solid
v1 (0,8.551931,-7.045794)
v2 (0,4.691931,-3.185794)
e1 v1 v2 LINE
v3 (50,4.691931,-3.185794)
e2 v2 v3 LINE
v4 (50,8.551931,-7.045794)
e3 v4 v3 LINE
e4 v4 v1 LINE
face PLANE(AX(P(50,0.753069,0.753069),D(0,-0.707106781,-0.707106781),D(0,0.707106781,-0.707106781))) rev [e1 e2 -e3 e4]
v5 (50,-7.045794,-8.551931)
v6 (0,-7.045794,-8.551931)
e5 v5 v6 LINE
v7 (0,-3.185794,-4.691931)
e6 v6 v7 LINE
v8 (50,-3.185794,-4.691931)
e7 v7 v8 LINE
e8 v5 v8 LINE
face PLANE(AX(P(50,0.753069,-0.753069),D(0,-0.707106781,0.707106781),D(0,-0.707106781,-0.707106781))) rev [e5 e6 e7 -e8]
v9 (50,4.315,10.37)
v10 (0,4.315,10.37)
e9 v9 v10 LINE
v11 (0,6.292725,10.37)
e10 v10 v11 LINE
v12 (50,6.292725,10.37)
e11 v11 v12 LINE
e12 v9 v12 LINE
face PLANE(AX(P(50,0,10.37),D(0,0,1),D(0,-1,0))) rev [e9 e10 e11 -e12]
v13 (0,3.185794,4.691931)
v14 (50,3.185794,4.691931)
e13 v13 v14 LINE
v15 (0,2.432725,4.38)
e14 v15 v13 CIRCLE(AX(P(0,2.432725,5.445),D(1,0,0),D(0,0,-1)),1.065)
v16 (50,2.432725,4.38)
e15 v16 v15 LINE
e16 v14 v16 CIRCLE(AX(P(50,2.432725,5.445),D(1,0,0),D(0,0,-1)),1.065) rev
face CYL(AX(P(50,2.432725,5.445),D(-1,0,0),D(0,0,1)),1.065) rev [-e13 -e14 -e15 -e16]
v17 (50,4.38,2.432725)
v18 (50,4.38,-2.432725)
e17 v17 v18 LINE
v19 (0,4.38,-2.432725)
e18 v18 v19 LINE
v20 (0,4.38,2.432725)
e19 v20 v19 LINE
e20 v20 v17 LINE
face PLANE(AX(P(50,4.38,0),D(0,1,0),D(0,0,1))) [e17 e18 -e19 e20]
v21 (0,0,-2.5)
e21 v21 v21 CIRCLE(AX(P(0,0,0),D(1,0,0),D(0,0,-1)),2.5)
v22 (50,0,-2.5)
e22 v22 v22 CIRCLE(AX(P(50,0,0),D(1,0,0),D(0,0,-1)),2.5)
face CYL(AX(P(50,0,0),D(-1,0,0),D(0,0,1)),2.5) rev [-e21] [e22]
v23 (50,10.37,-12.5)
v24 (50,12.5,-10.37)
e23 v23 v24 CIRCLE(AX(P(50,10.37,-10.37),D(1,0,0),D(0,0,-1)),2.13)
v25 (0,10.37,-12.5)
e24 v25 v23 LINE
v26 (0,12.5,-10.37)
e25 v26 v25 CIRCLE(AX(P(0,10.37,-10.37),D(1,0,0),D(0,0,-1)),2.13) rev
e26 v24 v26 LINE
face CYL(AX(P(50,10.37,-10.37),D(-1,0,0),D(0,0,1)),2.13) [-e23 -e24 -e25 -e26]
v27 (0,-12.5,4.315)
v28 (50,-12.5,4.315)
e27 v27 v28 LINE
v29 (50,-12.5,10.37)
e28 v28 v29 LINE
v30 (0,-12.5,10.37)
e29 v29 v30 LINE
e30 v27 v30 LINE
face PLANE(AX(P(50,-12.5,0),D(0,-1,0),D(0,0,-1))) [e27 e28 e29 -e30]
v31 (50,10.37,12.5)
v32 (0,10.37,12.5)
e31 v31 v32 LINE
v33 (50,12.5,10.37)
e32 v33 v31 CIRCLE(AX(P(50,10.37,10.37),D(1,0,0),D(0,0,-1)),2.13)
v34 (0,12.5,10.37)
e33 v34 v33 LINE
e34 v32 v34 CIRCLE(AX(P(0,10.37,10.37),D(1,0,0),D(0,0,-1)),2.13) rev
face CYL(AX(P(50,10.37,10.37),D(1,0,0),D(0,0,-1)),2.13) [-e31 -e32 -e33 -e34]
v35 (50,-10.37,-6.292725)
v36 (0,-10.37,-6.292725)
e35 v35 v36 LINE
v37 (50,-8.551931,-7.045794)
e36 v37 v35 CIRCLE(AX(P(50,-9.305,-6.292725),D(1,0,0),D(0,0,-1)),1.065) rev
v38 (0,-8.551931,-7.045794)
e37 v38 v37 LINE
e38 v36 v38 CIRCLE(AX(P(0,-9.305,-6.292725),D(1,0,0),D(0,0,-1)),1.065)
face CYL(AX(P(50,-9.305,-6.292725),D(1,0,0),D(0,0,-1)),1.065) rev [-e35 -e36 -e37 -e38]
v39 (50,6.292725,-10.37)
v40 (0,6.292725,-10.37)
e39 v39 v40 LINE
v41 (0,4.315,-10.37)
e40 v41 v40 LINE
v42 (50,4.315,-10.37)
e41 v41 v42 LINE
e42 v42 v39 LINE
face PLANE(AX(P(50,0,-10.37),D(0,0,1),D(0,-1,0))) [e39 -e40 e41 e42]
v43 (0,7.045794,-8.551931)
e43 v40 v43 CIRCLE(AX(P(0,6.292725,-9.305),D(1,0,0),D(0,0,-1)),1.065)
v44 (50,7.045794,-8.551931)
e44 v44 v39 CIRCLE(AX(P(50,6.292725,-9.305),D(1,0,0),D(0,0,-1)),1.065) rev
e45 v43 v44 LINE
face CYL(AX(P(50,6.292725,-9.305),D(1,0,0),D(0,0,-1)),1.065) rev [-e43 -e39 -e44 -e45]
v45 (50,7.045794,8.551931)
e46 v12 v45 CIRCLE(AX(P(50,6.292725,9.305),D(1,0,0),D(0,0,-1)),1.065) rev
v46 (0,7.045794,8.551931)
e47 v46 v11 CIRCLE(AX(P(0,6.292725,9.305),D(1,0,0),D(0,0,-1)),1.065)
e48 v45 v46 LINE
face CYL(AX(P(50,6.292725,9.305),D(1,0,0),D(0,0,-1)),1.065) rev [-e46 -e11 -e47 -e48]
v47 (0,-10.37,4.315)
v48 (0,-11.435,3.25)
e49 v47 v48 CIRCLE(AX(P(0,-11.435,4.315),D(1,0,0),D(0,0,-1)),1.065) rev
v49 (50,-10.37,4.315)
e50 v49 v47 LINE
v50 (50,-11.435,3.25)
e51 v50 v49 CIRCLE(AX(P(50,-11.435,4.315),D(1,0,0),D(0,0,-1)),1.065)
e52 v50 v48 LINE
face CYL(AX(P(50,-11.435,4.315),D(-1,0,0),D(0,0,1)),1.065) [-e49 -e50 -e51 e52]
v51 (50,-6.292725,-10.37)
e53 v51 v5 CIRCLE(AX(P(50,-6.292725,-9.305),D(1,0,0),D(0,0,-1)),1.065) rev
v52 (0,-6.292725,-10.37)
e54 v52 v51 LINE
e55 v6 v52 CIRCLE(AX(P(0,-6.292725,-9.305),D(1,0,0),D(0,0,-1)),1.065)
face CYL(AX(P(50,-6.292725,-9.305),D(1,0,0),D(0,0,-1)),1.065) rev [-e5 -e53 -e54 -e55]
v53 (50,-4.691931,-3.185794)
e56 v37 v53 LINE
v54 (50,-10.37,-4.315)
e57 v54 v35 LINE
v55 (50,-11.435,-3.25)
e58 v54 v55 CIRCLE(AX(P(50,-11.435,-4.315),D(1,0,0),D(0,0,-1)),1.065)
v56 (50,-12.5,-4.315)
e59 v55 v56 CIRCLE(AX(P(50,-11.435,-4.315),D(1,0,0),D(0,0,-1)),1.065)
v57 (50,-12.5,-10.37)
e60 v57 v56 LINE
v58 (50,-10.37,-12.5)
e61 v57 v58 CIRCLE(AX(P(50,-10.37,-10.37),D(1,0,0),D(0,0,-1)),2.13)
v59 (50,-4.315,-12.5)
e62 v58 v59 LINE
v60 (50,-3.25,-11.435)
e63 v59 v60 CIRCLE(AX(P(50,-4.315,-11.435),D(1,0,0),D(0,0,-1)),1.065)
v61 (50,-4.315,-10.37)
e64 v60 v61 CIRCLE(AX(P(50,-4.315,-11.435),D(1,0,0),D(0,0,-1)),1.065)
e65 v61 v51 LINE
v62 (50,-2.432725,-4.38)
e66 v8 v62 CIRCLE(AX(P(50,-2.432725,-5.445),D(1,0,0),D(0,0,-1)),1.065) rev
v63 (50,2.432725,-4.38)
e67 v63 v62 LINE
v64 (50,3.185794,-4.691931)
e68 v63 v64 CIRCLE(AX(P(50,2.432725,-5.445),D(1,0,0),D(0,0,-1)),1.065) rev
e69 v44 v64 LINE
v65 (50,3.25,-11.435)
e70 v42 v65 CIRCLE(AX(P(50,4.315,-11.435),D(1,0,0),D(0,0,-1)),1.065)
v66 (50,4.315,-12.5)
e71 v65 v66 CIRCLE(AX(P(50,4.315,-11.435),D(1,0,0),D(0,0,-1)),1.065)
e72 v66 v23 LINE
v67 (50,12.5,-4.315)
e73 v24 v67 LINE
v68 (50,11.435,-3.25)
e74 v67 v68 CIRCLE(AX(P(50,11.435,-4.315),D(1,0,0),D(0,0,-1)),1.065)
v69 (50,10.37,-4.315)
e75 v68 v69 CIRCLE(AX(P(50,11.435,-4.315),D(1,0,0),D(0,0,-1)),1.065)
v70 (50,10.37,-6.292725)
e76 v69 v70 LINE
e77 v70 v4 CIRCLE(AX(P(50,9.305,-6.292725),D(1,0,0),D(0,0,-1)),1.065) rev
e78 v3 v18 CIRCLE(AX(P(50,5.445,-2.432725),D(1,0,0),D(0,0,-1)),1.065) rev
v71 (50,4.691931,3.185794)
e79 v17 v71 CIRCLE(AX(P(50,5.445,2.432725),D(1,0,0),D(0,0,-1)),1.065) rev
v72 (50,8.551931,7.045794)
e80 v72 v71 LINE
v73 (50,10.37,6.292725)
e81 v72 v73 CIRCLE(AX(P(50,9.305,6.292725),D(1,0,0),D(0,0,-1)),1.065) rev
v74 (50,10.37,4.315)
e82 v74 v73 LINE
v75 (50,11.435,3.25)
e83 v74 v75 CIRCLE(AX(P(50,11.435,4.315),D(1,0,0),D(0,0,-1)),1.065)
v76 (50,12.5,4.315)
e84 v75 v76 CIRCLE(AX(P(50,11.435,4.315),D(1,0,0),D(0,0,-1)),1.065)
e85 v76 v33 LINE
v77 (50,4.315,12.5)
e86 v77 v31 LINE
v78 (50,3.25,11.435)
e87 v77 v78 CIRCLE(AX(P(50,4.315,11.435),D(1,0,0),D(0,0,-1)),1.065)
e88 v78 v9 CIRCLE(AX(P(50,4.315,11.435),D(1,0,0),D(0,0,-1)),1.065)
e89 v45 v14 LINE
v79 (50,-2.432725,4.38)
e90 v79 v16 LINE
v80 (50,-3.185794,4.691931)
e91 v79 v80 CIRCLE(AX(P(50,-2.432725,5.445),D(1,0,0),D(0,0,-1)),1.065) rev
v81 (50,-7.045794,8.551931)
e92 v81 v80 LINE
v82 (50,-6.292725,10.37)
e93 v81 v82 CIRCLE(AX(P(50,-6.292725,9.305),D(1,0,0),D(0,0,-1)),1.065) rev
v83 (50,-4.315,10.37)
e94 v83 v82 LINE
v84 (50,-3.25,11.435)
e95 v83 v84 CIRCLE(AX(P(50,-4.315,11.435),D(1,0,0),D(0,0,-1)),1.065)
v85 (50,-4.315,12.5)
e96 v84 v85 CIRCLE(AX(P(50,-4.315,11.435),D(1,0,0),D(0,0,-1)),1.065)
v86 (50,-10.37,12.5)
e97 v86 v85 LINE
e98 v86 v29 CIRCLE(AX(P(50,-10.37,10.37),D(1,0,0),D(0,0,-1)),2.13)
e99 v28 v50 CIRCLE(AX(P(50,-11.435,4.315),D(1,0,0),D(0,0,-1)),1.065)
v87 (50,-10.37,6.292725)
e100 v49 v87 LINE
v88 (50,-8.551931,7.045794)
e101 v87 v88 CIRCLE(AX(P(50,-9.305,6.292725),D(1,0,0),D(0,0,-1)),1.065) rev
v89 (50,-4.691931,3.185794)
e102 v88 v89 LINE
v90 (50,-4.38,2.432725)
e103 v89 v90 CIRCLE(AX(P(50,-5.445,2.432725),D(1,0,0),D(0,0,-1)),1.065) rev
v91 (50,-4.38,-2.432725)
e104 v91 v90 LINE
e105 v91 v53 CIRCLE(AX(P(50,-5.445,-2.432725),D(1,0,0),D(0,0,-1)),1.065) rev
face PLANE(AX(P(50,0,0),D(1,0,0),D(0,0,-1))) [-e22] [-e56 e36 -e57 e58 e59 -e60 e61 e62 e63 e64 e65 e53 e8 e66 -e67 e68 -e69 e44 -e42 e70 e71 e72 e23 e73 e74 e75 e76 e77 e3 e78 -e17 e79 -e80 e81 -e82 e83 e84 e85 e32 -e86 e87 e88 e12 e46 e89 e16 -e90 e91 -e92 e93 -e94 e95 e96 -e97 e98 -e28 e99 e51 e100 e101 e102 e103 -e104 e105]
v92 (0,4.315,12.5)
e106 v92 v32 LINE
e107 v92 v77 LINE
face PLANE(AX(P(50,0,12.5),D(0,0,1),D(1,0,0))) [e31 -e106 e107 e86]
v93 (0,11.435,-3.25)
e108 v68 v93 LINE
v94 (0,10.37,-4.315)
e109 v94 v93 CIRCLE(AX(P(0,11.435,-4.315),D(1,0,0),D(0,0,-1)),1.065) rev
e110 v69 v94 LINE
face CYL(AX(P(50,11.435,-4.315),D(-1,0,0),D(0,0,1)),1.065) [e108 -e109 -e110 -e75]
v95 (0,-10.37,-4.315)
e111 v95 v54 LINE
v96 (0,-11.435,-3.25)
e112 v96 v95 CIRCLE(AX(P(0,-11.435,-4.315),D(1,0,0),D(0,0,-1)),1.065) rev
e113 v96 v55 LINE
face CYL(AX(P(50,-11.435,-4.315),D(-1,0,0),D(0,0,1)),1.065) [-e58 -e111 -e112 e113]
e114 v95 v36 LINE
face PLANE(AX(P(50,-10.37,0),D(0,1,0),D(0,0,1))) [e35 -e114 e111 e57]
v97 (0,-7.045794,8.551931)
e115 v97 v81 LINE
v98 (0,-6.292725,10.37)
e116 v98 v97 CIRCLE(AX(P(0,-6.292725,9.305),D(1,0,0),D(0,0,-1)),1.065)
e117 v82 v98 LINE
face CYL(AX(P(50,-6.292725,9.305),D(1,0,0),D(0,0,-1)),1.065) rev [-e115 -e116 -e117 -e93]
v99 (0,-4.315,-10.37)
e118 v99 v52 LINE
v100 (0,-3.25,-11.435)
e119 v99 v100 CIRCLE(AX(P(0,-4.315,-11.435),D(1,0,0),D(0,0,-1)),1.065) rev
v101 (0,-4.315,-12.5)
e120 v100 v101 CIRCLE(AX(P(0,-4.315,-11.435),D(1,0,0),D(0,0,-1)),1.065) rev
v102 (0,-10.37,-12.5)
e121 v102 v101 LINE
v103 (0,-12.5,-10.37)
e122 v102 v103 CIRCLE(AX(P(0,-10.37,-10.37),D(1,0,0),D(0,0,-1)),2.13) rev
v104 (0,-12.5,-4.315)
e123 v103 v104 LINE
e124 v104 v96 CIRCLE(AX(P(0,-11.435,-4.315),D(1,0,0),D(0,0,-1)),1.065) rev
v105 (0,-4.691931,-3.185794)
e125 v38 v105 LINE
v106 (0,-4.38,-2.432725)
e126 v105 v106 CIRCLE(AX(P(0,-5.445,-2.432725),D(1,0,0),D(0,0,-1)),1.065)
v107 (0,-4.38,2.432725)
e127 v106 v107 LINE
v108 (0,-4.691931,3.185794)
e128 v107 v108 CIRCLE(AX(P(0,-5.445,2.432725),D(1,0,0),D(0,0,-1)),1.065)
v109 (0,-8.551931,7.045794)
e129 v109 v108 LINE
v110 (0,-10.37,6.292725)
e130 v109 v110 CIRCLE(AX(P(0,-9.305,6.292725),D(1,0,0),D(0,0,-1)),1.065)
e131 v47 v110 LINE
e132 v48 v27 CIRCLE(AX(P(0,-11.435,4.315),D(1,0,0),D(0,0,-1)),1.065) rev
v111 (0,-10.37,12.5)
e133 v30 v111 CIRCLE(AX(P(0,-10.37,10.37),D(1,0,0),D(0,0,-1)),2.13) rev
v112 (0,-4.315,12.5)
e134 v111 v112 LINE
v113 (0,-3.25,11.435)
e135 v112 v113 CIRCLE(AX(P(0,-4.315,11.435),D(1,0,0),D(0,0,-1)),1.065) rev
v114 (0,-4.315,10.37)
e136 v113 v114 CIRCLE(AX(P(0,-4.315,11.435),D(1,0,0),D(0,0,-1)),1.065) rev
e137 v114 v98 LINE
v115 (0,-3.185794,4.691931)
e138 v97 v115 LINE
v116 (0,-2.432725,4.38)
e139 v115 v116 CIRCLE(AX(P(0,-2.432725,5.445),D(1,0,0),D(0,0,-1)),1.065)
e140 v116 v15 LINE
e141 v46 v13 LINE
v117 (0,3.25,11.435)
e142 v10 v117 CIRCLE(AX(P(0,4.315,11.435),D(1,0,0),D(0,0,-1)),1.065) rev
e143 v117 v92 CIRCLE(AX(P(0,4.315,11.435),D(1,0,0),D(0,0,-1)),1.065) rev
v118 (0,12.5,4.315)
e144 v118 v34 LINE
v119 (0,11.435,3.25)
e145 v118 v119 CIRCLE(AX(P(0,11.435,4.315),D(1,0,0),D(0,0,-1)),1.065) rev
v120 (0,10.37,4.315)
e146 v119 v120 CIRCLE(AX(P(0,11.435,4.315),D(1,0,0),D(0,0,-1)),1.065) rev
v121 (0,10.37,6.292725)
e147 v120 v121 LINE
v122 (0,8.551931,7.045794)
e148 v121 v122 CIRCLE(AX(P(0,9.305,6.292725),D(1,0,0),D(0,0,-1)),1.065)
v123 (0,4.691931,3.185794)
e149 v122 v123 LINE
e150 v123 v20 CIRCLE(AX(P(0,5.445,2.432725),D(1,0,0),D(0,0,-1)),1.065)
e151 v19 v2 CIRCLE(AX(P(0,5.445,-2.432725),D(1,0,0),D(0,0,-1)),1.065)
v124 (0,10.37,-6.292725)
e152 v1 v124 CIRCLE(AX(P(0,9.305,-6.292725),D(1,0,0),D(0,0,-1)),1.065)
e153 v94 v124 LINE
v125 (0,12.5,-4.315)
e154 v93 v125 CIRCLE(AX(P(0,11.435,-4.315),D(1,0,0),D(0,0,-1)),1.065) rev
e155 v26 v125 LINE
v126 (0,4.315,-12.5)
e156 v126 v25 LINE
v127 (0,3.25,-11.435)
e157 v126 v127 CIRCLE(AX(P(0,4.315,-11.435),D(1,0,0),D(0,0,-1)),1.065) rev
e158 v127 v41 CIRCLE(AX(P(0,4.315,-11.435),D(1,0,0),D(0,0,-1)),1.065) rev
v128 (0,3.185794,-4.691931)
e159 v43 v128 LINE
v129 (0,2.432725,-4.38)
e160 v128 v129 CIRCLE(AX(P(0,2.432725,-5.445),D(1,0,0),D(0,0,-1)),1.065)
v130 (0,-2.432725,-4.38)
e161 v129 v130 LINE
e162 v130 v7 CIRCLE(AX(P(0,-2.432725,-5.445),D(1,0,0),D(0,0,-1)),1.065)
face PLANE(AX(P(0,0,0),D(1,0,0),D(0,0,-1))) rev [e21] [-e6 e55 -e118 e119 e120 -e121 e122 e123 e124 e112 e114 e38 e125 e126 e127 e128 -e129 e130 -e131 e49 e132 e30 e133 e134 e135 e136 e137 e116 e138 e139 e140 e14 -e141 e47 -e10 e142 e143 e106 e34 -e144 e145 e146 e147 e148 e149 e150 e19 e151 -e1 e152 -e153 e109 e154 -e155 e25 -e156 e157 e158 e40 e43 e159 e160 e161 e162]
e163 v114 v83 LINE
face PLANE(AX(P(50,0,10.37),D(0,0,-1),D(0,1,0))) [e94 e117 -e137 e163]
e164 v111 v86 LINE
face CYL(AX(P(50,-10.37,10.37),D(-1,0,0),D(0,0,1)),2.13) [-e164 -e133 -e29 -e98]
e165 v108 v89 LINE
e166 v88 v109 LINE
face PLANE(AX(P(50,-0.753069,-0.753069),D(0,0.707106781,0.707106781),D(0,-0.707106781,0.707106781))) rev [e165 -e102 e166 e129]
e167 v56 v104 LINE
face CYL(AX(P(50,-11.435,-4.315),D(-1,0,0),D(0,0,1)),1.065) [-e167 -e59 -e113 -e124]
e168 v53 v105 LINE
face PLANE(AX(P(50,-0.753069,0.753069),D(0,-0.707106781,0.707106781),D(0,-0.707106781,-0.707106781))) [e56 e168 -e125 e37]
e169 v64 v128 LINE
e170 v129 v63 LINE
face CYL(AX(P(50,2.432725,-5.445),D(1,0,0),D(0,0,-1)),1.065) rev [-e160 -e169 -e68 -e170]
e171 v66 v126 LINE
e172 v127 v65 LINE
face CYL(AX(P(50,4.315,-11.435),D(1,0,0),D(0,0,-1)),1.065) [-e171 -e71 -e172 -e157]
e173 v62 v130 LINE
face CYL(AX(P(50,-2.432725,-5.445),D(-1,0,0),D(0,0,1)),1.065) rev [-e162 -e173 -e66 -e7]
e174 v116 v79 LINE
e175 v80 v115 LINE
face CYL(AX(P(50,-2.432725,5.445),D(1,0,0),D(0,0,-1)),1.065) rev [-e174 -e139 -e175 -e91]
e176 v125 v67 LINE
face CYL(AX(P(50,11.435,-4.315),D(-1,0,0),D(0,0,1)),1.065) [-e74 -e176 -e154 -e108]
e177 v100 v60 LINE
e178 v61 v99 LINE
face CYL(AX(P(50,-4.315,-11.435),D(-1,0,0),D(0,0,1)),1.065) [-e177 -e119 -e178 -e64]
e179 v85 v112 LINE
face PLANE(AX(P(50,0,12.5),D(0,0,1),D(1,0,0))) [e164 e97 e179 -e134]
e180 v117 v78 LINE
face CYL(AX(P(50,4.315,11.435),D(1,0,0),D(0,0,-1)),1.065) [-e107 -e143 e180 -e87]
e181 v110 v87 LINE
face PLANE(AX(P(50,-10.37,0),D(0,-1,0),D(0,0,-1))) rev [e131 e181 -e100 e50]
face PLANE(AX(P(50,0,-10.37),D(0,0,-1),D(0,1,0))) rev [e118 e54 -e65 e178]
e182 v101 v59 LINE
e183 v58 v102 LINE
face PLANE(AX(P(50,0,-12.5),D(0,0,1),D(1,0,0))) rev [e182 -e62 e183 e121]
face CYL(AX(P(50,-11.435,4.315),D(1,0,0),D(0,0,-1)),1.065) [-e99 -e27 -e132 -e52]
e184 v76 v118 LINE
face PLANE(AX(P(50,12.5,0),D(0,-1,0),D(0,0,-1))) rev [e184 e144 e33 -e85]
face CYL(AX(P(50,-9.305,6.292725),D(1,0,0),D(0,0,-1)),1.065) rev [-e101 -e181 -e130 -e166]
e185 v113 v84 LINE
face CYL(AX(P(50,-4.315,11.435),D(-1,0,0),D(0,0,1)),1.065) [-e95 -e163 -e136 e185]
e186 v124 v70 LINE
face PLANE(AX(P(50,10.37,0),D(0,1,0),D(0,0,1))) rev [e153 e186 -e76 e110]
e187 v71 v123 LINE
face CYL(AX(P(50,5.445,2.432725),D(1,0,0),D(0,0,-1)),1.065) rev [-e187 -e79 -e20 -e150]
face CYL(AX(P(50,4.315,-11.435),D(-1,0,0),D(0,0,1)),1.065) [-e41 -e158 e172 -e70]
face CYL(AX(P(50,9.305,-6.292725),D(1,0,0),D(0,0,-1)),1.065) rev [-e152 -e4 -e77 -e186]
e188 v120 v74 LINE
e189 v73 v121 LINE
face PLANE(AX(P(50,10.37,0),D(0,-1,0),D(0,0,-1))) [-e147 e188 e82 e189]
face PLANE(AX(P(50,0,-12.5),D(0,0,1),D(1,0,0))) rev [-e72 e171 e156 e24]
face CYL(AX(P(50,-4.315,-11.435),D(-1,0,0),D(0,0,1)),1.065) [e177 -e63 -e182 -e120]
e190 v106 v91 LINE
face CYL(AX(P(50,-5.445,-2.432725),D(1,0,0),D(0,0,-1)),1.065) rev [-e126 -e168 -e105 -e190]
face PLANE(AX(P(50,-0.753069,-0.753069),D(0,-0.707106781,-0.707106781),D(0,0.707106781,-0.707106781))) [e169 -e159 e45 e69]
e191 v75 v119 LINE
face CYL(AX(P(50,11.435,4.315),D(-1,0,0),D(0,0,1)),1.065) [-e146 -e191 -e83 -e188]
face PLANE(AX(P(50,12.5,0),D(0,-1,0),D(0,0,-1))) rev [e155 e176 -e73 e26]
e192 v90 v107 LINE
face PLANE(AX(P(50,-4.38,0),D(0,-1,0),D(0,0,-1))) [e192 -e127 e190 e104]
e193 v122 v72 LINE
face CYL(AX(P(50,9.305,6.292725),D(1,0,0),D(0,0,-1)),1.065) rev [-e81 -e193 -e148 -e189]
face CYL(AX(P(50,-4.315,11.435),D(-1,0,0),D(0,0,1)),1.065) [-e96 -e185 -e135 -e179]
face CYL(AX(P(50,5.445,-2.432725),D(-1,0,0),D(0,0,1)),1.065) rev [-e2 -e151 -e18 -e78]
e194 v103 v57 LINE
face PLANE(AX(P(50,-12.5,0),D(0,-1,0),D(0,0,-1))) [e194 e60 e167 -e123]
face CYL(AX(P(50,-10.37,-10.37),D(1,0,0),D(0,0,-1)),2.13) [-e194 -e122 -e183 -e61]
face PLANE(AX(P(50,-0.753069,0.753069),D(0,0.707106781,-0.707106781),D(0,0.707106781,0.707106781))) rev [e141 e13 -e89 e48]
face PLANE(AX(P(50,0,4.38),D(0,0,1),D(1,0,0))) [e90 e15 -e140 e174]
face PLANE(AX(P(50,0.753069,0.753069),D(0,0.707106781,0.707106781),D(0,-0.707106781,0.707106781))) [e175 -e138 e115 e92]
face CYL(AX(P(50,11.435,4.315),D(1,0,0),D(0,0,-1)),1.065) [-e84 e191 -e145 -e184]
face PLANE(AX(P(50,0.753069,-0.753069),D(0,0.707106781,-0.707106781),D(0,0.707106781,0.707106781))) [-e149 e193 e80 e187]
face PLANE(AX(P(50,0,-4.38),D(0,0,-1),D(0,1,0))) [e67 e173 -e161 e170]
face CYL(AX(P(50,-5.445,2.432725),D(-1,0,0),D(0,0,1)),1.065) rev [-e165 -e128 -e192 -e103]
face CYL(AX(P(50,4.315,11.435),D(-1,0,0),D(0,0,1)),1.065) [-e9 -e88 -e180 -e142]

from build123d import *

# Parameters (mm, degrees)
SKETCH1_R           = 2.5
BOSS_EXTRUDE1_DEPTH = 50
FILLET1_R           = 1.065
FILLET2_R           = 2.13


with BuildPart() as part:
    # Sketch1 → Boss-Extrude1 (new body)
    with BuildSketch(Plane.YZ):
        Polygon((-12.5, -3.25), (-12.5, -12.5), (-3.25, -12.5), (-3.25, -10.37), (-8.863862556, -10.37), (-2.873862556, -4.38), (2.873862556, -4.38), (8.863862556, -10.37), (3.25, -10.37), (3.25, -12.5), (12.5, -12.5), (12.5, -3.25), (10.37, -3.25), (10.37, -8.863862556), (4.38, -2.873862556), (4.38, 2.873862556), (10.37, 8.863862556), (10.37, 3.25), (12.5, 3.25), (12.5, 12.5), (3.25, 12.5), (3.25, 10.37), (8.863862556, 10.37), (2.873862556, 4.38), (-2.873862556, 4.38), (-8.863862556, 10.37), (-3.25, 10.37), (-3.25, 12.5), (-12.5, 12.5), (-12.5, 3.25), (-10.37, 3.25), (-10.37, 8.863862556), (-4.38, 2.873862556), (-4.38, -2.873862556), (-10.37, -8.863862556), (-10.37, -3.25), align=None)
        with Locations(Location((0, 0, 0), (0, 0, 270))):
            Circle(SKETCH1_R, mode=Mode.SUBTRACT)
    extrude(amount=BOSS_EXTRUDE1_DEPTH)

    # Fillet1
    fillet1_edges = [part.edges().sort_by_distance(p)[0] for p in [
        (25, -10.37, -8.863862556),
        (25, 2.873862556, -4.38),
        (25, -2.873862556, -4.38),
        (25, -4.38, 2.873862556),
        (25, -4.38, -2.873862556),
        (25, -2.873862556, 4.38),
        (25, 2.873862556, 4.38),
        (25, 4.38, 2.873862556),
        (25, 4.38, -2.873862556),
        (25, -8.863862556, -10.37),
        (25, 8.863862556, -10.37),
        (25, 10.37, -8.863862556),
        (25, -10.37, 8.863862556),
        (25, -8.863862556, 10.37),
        (25, 10.37, 8.863862556),
        (25, 8.863862556, 10.37),
        (25, 12.5, 3.25),
        (25, -3.25, -12.5),
        (25, -10.37, 3.25),
        (25, 10.37, 3.25),
        (25, -10.37, -3.25),
        (25, -12.5, -3.25),
        (25, -12.5, 3.25),
        (25, 3.25, -10.37),
        (25, -3.25, -10.37),
        (25, 3.25, -12.5),
        (25, 10.37, -3.25),
        (25, 12.5, -3.25),
        (25, 3.25, 12.5),
        (25, 3.25, 10.37),
        (25, -3.25, 10.37),
        (25, -3.25, 12.5),
    ]]
    fillet(fillet1_edges, radius=FILLET1_R - 0.0001)  # a hair under: the kernel refuses the full size

    # Fillet2
    fillet2_edges = [part.edges().sort_by_distance(p)[0] for p in [
        (25, -12.5, 12.5),
        (25, 12.5, 12.5),
        (25, 12.5, -12.5),
        (25, -12.5, -12.5),
    ]]
    fillet(fillet2_edges, radius=FILLET2_R)


solid = part.part
